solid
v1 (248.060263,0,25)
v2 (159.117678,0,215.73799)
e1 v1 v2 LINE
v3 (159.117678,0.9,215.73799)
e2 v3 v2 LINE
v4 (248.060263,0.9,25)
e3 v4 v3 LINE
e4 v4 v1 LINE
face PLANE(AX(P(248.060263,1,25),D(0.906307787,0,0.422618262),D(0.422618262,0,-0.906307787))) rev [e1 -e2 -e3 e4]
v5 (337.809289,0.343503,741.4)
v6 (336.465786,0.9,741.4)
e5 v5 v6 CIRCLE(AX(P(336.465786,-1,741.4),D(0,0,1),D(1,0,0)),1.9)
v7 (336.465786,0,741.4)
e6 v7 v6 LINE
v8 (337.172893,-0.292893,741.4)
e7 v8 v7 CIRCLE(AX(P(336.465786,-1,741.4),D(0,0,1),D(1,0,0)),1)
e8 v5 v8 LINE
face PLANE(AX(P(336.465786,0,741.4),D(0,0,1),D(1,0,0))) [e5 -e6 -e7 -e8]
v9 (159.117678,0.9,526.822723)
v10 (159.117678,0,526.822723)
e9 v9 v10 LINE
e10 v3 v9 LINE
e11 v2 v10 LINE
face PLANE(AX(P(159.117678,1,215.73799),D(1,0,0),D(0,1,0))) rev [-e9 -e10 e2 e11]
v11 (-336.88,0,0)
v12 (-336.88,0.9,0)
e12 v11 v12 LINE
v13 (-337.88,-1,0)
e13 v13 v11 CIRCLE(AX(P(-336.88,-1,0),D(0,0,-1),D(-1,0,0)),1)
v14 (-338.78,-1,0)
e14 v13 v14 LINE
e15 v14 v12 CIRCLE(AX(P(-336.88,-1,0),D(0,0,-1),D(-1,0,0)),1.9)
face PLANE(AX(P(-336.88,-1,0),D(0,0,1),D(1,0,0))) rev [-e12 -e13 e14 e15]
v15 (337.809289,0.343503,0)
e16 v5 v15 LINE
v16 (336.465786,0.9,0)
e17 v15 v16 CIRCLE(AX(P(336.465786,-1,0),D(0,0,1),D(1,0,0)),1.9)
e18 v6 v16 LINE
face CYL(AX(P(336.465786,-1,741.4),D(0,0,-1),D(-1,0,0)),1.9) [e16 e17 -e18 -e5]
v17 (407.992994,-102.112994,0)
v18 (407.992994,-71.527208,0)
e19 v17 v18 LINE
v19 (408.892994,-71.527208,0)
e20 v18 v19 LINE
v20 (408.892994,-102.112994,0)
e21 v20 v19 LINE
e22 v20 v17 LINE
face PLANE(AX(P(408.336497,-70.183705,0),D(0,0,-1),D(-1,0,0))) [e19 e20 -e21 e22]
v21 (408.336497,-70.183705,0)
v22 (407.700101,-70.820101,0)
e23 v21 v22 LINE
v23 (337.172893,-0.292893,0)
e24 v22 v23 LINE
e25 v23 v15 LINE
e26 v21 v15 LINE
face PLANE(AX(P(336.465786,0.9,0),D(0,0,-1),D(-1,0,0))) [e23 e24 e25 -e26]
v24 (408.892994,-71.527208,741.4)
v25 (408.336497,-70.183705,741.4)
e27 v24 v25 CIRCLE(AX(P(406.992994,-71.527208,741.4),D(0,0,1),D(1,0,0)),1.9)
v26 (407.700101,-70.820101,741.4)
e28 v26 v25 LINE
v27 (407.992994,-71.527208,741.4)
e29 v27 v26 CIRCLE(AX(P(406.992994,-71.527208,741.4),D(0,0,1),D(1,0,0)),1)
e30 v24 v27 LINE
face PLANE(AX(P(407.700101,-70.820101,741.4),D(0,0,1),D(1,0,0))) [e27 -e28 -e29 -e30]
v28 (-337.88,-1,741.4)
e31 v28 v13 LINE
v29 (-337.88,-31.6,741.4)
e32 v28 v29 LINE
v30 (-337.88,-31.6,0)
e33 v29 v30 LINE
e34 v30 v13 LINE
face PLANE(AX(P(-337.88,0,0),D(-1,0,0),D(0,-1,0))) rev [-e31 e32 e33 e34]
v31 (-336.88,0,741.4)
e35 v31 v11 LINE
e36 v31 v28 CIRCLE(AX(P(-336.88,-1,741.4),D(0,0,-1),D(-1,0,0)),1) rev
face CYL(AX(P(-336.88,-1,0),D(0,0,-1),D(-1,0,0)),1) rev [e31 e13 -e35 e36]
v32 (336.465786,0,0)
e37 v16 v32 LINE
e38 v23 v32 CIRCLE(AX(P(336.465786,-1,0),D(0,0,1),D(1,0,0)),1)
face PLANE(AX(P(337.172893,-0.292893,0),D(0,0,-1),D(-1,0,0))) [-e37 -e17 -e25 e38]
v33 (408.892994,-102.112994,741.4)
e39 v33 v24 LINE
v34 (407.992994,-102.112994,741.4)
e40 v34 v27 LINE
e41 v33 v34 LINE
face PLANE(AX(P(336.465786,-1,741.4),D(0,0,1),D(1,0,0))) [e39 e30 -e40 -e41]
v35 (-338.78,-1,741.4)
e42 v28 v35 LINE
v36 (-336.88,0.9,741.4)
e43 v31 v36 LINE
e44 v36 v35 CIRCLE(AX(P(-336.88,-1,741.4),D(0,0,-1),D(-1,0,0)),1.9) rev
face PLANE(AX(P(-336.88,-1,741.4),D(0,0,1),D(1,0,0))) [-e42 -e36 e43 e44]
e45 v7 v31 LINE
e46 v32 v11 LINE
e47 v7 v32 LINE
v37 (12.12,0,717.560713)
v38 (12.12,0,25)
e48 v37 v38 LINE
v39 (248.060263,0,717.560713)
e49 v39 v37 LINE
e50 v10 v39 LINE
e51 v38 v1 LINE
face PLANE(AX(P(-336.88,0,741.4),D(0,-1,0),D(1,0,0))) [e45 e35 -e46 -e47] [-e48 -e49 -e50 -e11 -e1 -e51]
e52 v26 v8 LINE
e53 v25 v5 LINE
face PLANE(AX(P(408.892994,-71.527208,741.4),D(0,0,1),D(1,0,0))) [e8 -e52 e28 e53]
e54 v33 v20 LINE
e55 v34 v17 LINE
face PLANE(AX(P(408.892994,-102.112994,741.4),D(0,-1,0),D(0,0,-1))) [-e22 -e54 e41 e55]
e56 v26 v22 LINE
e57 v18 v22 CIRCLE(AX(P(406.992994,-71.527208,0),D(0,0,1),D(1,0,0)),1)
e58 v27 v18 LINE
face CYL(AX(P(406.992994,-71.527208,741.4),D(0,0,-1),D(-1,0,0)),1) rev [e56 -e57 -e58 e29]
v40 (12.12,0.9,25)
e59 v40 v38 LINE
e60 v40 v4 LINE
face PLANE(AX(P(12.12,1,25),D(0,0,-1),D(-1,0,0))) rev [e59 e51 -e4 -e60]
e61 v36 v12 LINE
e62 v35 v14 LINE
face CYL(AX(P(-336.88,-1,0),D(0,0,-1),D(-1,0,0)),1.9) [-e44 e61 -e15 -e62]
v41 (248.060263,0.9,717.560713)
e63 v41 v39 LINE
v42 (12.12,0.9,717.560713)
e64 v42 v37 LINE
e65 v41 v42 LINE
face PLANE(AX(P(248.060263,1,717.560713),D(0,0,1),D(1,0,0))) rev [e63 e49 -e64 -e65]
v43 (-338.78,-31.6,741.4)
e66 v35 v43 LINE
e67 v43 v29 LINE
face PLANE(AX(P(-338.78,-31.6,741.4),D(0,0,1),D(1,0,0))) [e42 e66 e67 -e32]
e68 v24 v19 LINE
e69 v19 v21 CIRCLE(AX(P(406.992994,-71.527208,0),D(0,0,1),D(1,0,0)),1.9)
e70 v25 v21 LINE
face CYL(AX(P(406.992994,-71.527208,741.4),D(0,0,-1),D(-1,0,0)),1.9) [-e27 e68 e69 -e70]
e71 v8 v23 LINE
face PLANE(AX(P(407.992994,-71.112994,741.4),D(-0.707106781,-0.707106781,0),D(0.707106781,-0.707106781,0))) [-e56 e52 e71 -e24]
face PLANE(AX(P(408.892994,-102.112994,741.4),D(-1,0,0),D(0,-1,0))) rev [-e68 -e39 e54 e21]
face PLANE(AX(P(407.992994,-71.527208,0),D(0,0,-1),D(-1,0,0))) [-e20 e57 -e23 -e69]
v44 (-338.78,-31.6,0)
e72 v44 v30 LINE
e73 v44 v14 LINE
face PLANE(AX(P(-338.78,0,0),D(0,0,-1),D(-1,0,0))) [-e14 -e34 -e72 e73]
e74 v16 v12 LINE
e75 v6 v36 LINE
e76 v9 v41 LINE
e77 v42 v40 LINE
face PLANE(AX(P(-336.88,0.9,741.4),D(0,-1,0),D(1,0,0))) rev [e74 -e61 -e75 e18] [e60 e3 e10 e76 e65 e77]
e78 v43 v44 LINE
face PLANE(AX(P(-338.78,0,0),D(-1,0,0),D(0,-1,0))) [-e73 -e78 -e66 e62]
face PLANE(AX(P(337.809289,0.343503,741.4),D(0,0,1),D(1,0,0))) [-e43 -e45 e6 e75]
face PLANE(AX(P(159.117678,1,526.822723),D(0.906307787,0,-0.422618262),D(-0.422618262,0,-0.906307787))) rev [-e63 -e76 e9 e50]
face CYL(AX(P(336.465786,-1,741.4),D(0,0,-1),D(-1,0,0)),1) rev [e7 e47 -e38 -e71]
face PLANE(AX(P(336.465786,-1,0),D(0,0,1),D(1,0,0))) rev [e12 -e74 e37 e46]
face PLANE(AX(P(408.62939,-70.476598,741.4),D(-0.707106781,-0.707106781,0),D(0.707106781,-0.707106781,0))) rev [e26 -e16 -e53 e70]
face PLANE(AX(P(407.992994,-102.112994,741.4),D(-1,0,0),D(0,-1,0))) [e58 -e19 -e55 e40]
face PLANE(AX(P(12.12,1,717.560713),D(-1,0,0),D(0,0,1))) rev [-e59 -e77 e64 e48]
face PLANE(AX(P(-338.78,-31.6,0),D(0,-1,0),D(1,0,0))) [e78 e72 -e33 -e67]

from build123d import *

# Parameters (mm, degrees)
BASE_FLANGE1_DEPTH = 741.4
EDGE_FLANGE1_DEPTH = 741.4
CUT_EXTRUDE3_DEPTH = 1


# Sheet-metal steps are written as plain solids
with BuildPart() as part:
    # Sketch1 → Base-Flange1 (new body)
    with BuildSketch(Plane.XY):
        with BuildLine():
            Line((-336.88, 0), (336.465786438, 0))
            ThreePointArc((336.465786438, 0), (336.84846987, -0.076120467), (337.172893219, -0.292893219))
            Line((337.172893219, -0.292893219), (407.700101013, -70.820101013))
            ThreePointArc((407.700101013, -70.820101013), (407.916873764, -71.144524361), (407.992994231, -71.527207794))
            Line((407.992994231, -71.527207794), (407.992994231, -102.112994231))
            Line((407.992994231, -102.112994231), (408.892994231, -102.112994231))
            Line((408.892994231, -102.112994231), (408.892994231, -71.527207794))
            ThreePointArc((408.892994231, -71.527207794), (408.748365343, -70.800109272), (408.336497116, -70.183704909))
            Line((408.336497116, -70.18370491), (337.809289322, 0.343502884))
            ThreePointArc((337.809289322, 0.343502884), (337.192884959, 0.755371112), (336.465786438, 0.9))
            Line((336.465786438, 0.9), (-336.88, 0.9))
            Line((-336.88, 0.9), (-336.88, 0))
        make_face()
    extrude(amount=BASE_FLANGE1_DEPTH)

    # Edge-Flange1 section (across the edge) → Edge-Flange1 (add)
    with BuildSketch(Plane(origin=(-337.88, 0, 741.4), x_dir=(1, 0, 0), z_dir=(0, 0, -1))):
        with BuildLine():
            Line((-0.9, 1), (-0.9, 31.6))
            Line((-0.9, 31.6), (0, 31.6))
            Line((0, 31.6), (0, 1))
            ThreePointArc((0, 1), (0.292893219, 0.292893219), (1, 0))
            Line((1, 0), (1, -0.9))
            ThreePointArc((1, -0.9), (-0.343502884, -0.343502884), (-0.9, 1))
        make_face()
    extrude(amount=EDGE_FLANGE1_DEPTH)

    # Sketch14 → Cut-Extrude3 (cut)
    with BuildSketch(Plane.XZ):
        Polygon((159.117677791, 526.822723002), (248.060263169, 717.560712871), (12.12, 717.560712871), (12.12, 25), (248.060263169, 25), (159.117677791, 215.737989869), align=None)
    extrude(amount=-CUT_EXTRUDE3_DEPTH, mode=Mode.SUBTRACT)


solid = part.part
